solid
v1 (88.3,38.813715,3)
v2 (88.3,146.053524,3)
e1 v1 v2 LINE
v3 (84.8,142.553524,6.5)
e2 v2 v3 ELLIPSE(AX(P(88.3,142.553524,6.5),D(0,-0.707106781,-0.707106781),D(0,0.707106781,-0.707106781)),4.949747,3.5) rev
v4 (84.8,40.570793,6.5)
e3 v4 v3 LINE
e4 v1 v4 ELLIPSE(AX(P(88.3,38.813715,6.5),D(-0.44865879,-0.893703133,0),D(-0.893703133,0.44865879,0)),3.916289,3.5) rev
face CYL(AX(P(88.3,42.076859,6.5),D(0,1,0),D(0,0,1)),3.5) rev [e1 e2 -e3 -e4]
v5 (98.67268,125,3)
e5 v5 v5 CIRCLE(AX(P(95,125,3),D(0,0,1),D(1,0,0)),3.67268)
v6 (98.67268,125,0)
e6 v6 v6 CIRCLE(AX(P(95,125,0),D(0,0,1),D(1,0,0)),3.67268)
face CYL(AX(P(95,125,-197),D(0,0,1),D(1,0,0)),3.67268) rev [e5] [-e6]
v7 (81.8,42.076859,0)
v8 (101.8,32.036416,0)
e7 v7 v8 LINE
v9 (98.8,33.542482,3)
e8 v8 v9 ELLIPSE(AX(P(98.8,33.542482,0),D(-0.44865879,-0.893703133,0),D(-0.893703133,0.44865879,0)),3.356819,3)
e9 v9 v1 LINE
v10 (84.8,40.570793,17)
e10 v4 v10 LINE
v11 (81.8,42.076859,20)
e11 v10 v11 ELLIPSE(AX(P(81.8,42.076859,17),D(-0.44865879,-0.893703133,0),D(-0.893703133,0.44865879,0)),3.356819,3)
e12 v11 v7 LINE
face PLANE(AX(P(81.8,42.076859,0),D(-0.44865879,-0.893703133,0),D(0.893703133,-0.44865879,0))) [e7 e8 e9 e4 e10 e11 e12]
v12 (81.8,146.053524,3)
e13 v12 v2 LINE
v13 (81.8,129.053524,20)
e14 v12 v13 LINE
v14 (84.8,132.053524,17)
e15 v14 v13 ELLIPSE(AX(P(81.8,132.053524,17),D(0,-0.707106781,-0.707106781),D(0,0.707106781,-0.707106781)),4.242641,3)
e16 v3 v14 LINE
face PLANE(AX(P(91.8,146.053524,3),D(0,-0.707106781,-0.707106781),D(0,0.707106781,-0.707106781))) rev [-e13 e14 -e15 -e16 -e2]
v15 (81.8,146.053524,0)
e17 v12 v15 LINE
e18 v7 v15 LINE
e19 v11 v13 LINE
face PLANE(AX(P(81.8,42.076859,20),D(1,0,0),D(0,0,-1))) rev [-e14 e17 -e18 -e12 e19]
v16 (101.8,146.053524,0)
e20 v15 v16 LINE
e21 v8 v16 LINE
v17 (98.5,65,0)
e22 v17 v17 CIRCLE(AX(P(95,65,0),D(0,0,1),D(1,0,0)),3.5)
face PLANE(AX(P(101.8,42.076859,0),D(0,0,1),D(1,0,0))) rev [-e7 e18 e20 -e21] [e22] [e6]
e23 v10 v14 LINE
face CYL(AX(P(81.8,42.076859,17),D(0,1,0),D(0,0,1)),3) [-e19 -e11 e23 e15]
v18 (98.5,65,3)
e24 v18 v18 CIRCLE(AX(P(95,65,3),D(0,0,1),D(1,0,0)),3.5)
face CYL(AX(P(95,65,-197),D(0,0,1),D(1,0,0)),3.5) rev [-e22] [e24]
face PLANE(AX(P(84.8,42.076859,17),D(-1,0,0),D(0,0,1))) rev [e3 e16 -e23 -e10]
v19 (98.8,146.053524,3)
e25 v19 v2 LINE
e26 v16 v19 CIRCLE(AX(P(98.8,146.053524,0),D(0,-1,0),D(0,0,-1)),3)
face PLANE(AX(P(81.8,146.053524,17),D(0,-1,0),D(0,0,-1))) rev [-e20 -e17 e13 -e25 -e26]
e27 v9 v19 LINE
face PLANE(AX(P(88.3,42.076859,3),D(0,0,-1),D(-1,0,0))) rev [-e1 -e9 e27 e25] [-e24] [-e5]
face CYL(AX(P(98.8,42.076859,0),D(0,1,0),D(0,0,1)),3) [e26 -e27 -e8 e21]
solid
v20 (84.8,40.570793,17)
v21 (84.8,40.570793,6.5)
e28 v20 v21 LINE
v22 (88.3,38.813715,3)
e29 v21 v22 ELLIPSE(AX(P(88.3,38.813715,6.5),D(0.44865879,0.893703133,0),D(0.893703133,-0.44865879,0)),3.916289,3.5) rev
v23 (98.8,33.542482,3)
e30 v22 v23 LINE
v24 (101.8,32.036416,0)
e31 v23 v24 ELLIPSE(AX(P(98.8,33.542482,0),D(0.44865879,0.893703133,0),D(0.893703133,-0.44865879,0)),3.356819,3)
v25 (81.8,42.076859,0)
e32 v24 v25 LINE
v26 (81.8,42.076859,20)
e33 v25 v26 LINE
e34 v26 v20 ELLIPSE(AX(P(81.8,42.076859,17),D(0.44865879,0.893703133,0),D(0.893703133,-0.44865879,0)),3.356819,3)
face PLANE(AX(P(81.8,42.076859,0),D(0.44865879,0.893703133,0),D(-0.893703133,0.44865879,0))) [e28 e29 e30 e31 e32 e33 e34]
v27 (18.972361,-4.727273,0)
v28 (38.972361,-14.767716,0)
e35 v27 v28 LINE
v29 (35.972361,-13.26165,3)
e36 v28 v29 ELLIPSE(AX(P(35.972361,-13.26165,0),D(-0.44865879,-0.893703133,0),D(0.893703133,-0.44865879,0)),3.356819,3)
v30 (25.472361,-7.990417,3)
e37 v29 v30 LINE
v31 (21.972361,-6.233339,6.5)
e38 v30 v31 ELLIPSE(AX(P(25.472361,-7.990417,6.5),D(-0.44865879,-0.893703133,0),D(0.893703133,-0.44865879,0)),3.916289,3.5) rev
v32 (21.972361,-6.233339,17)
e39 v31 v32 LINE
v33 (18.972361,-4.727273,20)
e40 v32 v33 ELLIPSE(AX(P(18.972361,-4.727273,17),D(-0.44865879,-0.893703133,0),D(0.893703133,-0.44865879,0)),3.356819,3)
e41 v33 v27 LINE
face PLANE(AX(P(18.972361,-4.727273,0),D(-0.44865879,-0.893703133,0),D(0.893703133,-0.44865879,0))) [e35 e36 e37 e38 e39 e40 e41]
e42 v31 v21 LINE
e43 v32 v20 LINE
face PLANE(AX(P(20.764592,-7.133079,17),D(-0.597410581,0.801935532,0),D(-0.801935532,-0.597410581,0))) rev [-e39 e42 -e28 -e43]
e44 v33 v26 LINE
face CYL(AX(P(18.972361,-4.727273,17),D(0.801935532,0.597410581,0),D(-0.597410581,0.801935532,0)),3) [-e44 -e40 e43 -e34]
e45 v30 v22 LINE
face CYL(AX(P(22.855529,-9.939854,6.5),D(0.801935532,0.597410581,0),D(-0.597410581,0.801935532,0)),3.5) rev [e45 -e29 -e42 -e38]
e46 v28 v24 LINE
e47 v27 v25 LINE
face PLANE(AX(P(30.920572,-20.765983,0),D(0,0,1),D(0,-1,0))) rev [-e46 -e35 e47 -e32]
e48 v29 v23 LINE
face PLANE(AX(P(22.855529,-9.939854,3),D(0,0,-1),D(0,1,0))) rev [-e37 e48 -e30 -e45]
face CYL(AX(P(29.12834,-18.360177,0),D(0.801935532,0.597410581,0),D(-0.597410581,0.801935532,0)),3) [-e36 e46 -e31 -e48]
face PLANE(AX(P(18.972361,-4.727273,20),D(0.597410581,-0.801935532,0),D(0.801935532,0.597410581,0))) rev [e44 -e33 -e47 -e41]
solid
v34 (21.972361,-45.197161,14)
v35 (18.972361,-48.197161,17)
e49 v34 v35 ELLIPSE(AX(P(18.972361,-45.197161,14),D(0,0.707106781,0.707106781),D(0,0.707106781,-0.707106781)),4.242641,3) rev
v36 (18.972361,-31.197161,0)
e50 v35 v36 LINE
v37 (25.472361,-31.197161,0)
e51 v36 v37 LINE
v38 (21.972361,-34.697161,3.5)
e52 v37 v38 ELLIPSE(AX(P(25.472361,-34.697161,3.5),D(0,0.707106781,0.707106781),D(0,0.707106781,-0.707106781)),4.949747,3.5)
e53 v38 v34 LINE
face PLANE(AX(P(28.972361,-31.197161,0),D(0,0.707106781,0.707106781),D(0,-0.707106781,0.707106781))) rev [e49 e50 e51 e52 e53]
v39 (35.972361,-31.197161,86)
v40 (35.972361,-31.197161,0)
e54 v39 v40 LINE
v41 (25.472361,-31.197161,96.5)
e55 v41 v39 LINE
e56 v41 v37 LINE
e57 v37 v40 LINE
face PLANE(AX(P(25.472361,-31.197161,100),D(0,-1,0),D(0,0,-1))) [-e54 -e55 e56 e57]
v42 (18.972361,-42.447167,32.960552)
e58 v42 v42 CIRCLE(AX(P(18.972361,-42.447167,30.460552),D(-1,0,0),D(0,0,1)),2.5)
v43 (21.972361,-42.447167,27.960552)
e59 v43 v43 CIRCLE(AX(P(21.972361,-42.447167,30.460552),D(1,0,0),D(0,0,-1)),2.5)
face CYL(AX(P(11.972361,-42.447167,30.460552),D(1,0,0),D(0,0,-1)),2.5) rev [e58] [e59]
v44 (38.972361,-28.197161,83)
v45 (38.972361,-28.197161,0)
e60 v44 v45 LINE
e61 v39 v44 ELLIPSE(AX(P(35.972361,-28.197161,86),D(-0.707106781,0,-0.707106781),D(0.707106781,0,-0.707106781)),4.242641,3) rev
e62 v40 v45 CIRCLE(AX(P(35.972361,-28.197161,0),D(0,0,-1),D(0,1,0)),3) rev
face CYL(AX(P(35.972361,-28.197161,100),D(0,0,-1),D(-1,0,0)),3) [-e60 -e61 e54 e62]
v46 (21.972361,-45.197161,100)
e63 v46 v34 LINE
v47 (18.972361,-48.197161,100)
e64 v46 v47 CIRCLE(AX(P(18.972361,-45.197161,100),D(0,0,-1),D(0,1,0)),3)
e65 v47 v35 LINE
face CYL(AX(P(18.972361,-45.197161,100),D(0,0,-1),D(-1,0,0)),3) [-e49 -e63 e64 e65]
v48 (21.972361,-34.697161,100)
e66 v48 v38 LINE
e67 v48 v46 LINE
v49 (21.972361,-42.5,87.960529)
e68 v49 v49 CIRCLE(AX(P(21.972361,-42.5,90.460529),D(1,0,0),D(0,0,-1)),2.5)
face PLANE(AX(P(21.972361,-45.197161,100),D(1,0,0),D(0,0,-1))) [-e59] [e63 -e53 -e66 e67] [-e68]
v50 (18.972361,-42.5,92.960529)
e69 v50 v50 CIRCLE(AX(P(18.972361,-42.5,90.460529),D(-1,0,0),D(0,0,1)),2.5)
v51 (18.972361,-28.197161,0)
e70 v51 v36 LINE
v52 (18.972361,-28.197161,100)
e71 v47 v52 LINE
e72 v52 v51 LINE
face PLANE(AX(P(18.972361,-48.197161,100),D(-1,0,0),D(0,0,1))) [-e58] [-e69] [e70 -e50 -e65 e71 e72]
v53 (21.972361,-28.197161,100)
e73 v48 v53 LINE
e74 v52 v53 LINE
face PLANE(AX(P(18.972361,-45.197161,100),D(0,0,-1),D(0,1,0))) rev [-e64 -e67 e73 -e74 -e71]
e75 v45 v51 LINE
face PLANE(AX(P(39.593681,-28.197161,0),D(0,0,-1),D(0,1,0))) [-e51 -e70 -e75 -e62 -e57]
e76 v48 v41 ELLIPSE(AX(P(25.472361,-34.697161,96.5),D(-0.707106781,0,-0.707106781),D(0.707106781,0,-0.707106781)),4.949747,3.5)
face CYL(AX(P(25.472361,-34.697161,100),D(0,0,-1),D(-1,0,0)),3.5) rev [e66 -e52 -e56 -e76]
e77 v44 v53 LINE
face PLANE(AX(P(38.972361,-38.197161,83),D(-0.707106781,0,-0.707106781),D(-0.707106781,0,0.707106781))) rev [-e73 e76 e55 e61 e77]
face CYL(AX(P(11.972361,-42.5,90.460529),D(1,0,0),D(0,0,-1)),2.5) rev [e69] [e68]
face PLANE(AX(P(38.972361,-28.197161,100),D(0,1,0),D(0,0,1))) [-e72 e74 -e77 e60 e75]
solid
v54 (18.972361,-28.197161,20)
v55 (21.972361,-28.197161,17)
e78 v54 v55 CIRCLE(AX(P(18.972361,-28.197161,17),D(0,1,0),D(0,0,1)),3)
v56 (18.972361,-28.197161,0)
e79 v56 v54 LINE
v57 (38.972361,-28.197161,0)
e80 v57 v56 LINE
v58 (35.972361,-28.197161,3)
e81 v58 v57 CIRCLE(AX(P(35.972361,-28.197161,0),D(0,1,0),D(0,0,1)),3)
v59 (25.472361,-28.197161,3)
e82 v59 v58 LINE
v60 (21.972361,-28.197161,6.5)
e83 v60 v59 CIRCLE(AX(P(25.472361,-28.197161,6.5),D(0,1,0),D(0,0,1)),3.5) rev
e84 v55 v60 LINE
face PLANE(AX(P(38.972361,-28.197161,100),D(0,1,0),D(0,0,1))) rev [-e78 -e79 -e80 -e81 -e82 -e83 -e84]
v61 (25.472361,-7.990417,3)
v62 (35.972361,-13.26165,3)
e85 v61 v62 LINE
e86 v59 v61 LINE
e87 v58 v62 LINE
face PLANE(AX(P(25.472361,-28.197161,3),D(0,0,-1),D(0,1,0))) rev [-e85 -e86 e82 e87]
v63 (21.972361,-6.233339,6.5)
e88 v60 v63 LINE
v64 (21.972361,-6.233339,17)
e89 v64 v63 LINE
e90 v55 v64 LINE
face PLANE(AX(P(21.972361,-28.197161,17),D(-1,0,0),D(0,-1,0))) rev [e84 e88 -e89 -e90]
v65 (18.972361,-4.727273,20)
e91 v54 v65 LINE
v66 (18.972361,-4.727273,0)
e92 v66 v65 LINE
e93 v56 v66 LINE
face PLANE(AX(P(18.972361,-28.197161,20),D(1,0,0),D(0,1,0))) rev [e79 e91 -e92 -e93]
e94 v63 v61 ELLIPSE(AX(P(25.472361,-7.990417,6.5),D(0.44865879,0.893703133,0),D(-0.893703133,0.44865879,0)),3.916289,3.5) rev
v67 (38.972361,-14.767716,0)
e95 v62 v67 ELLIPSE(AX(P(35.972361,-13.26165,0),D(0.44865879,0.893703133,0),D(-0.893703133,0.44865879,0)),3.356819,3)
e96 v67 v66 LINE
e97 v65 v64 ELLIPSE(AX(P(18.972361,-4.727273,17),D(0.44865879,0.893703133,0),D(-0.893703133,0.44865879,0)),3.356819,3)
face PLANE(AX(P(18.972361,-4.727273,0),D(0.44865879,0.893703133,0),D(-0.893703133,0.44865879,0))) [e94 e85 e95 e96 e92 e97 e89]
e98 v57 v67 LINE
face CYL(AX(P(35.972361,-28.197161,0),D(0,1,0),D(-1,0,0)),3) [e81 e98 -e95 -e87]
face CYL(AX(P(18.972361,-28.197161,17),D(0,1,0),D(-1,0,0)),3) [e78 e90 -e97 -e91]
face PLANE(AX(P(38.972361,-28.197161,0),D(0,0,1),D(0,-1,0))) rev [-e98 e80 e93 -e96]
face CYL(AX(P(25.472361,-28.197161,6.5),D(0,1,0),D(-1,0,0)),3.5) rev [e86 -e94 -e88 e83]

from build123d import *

# Parameters (mm, degrees)
L_START                              = 32.036415807
L_ANGLE_EQUAL_20X20X3_2_DEPTH        = 114.017108684
L_START_2                            = 64
L_ANGLE_EQUAL_20X20X3_2_2_OUTLINE_W  = 25
L_ANGLE_EQUAL_20X20X3_2_2_OUTLINE_H  = 24
L_ANGLE_EQUAL_20X20X3_2_2_DEPTH      = 10.304509974
L_START_3                            = 22.430930733
L_ANGLE_EQUAL_20X20X3_2_3_DEPTH      = 68.304556748
L_START_4                            = 12.390487258
L_ANGLE_EQUAL_20X20X3_2_4_DEPTH      = 88.385443698
L_START_5                            = -6
L_ANGLE_EQUAL_20X20X3_2_5_OUTLINE_W  = 60
L_ANGLE_EQUAL_20X20X3_2_5_OUTLINE_H  = 21
L_ANGLE_EQUAL_20X20X3_2_5_DEPTH      = 10.287337797
L_START_6                            = 74.304509974
L_ANGLE_EQUAL_20X20X3_2_6_OUTLINE_W  = 60
L_ANGLE_EQUAL_20X20X3_2_6_OUTLINE_H  = 21
L_ANGLE_EQUAL_20X20X3_2_6_DEPTH      = 9.695490026
L_START_7                            = -45.197160902
L_ANGLE_EQUAL_20X20X3_2_7_DEPTH      = 17
L_START_8                            = 1.242640687
L_ANGLE_EQUAL_20X20X3_2_8_DEPTH      = 98.757359313
L_START_9                            = 18.242640687
L_ANGLE_EQUAL_20X20X3_2_9_DEPTH      = 81.757359313
L_START_10                           = -49
L_ANGLE_EQUAL_20X20X3_2_10_DEPTH     = 22
L_START_11                           = -48.197160902
L_ANGLE_EQUAL_20X20X3_2_11_DEPTH     = 33.429444614
L_START_12                           = -14.767716288
L_ANGLE_EQUAL_20X20X3_2_12_DEPTH     = 10.040443476
L_START_13                           = 4.287337797
L_ANGLE_EQUAL_20X20X3_2_13_OUTLINE_W = 25
L_ANGLE_EQUAL_20X20X3_2_13_OUTLINE_H = 22
L_ANGLE_EQUAL_20X20X3_2_13_DEPTH     = 8.973175794
ESBO_O2_R                            = 3.5
ESBO_O2_R_2                          = 3.672679552
CORTE_EXTRUS_O1_DEPTH                = 200
ESBO_O3_R                            = 2.5
CORTE_EXTRUS_O2_DEPTH                = 10
CORTE_EXTRUS_O3_DEPTH                = 10
CORTE_EXTRUS_O4_DEPTH                = 10
CORTE_EXTRUS_O5_DEPTH                = 10
APARAR_ESTENDER4_START               = -48.197160902
APARAR_ESTENDER4_DEPTH               = 20
APARAR_ESTENDER4_2_DEPTH             = 20.621320344
CORTE_EXTRUS_O6_DEPTH                = 10


with BuildPart() as part:
    # L angle (equal) 20X20X3(2): read off the stored shape, not the designer's step
    # L angle (equal) 20X20X3(2) outline → L angle (equal) 20X20X3(2) (new body)
    with BuildSketch(Plane(origin=(0, 0, 0), x_dir=(1, 0, 0), z_dir=(0, 1, 0)).offset(L_START)):
        with BuildLine():
            Line((101.8, 0), (81.8, 0))
            Line((81.8, 0), (81.8, -20))
            ThreePointArc((81.8, -20), (83.921320344, -19.121320344), (84.8, -17))
            Line((84.8, -17), (84.8, -6.5))
            ThreePointArc((84.8, -6.5), (85.825126266, -4.025126266), (88.3, -3))
            Line((88.3, -3), (98.8, -3))
            ThreePointArc((98.8, -3), (100.921320344, -2.121320344), (101.8, 0))
        make_face()
    extrude(amount=L_ANGLE_EQUAL_20X20X3_2_DEPTH)

    # L angle _equal_ 20X20X3_2 2 outline → L angle _equal_ 20X20X3_2 2 (cut)
    with BuildSketch(Plane(origin=(0, 0, 0), x_dir=(0.8937031332908548, -0.4486587896677259, 0), z_dir=(0.4486587896677259, 0.8937031332908548, 0)).offset(L_START_2)):
        with Locations((65.5, -10)):
            Rectangle(L_ANGLE_EQUAL_20X20X3_2_2_OUTLINE_W, L_ANGLE_EQUAL_20X20X3_2_2_OUTLINE_H)
    extrude(amount=L_ANGLE_EQUAL_20X20X3_2_2_DEPTH, mode=Mode.SUBTRACT)

    # Esboço2 → Corte-extrusão1 (cut)
    with BuildSketch(Plane.XY.offset(3)):
        with Locations((95, 65)):
            Circle(ESBO_O2_R)
        with Locations((95, 125)):
            Circle(ESBO_O2_R_2)
    extrude(amount=-CORTE_EXTRUS_O1_DEPTH, mode=Mode.SUBTRACT)

    # Esboço5 → Corte-extrusão4 (cut)
    with BuildSketch(Plane.ZY.offset(-81.8)):
        Polygon((3, 146.053524491), (20, 129.053524491), (20, 146.053524491), align=None)
    extrude(amount=-CORTE_EXTRUS_O4_DEPTH, mode=Mode.SUBTRACT)


with BuildPart() as body_2:
    # L angle _equal_ 20X20X3_2 3 outline → L angle _equal_ 20X20X3_2 3 (new body)
    with BuildSketch(Plane(origin=(0, 0, 0), x_dir=(0.5974105809077824, -0.8019355322090584, 0), z_dir=(0.8019355322090584, 0.5974105809077825, 0)).offset(L_START_3)):
        with BuildLine():
            Line((35.125256976, 0), (15.125256976, 0))
            Line((15.125256976, 0), (15.125256976, -20))
            ThreePointArc((15.125256976, -20), (17.24657732, -19.121320344), (18.125256976, -17))
            Line((18.125256976, -17), (18.125256976, -6.5))
            ThreePointArc((18.125256976, -6.5), (19.150383242, -4.025126266), (21.625256976, -3))
            Line((21.625256976, -3), (32.125256976, -3))
            ThreePointArc((32.125256976, -3), (34.24657732, -2.121320344), (35.125256976, 0))
        make_face()
    extrude(amount=L_ANGLE_EQUAL_20X20X3_2_3_DEPTH)

    # L angle _equal_ 20X20X3_2 4 outline → L angle _equal_ 20X20X3_2 4 (add)
    with BuildSketch(Plane(origin=(0, 0, 0), x_dir=(0.5974105809077824, -0.8019355322090584, 0), z_dir=(0.8019355322090584, 0.5974105809077825, 0)).offset(L_START_4)):
        with BuildLine():
            Line((35.125256976, 0), (15.125256976, 0))
            Line((15.125256976, 0), (15.125256976, -20))
            ThreePointArc((15.125256976, -20), (17.24657732, -19.121320344), (18.125256976, -17))
            Line((18.125256976, -17), (18.125256976, -6.5))
            ThreePointArc((18.125256976, -6.5), (19.150383242, -4.025126266), (21.625256976, -3))
            Line((21.625256976, -3), (32.125256976, -3))
            ThreePointArc((32.125256976, -3), (34.24657732, -2.121320344), (35.125256976, 0))
        make_face()
    extrude(amount=L_ANGLE_EQUAL_20X20X3_2_4_DEPTH)

    # L angle _equal_ 20X20X3_2 5 outline → L angle _equal_ 20X20X3_2 5 (cut)
    with BuildSketch(Plane(origin=(0, 0, 0), x_dir=(0.8937031332908548, -0.4486587896677259, 0), z_dir=(0.4486587896677259, 0.8937031332908548, 0)).offset(L_START_5)):
        with Locations((48, -10.5)):
            Rectangle(L_ANGLE_EQUAL_20X20X3_2_5_OUTLINE_W, L_ANGLE_EQUAL_20X20X3_2_5_OUTLINE_H)
    extrude(amount=L_ANGLE_EQUAL_20X20X3_2_5_DEPTH, mode=Mode.SUBTRACT)

    # L angle _equal_ 20X20X3_2 6 outline → L angle _equal_ 20X20X3_2 6 (cut)
    with BuildSketch(Plane(origin=(0, 0, 0), x_dir=(0.8937031332908548, -0.4486587896677259, 0), z_dir=(0.4486587896677259, 0.8937031332908548, 0)).offset(L_START_6)):
        with Locations((48, -10.5)):
            Rectangle(L_ANGLE_EQUAL_20X20X3_2_6_OUTLINE_W, L_ANGLE_EQUAL_20X20X3_2_6_OUTLINE_H)
    extrude(amount=L_ANGLE_EQUAL_20X20X3_2_6_DEPTH, mode=Mode.SUBTRACT)


with BuildPart() as body_3:
    # L angle _equal_ 20X20X3_2 7 outline → L angle _equal_ 20X20X3_2 7 (new body)
    with BuildSketch(Plane(origin=(0, 0, 0), x_dir=(1, 0, 0), z_dir=(0, 1, 0)).offset(L_START_7)):
        Polygon((19.593680894, -20.621320344), (18.97236055, -20), (18.97236055, -100), (21.97236055, -100), (21.97236055, -18.242640687), align=None)
    extrude(amount=L_ANGLE_EQUAL_20X20X3_2_7_DEPTH)

    # L angle _equal_ 20X20X3_2 8 outline → L angle _equal_ 20X20X3_2 8 (add)
    with BuildSketch(Plane.XY.offset(L_START_8)):
        with BuildLine():
            ThreePointArc((21.97236055, -34.697160902), (22.997486816, -32.222287168), (25.47236055, -31.197160902))
            Line((25.47236055, -31.197160902), (35.97236055, -31.197160902))
            ThreePointArc((35.97236055, -31.197160902), (38.093680894, -30.318481246), (38.97236055, -28.197160902))
            Line((38.97236055, -28.197160902), (21.97236055, -28.197160902))
            Line((21.97236055, -28.197160902), (21.97236055, -34.697160902))
        make_face()
    extrude(amount=L_ANGLE_EQUAL_20X20X3_2_8_DEPTH)

    # L angle _equal_ 20X20X3_2 9 outline → L angle _equal_ 20X20X3_2 9 (add)
    with BuildSketch(Plane.XY.offset(L_START_9)):
        with BuildLine():
            ThreePointArc((18.97236055, -48.197160902), (21.093680894, -47.318481246), (21.97236055, -45.197160902))
            Line((21.97236055, -45.197160902), (18.97236055, -45.197160902))
            Line((18.97236055, -45.197160902), (18.97236055, -48.197160902))
        make_face()
    extrude(amount=L_ANGLE_EQUAL_20X20X3_2_9_DEPTH)

    # L angle _equal_ 20X20X3_2 10 outline → L angle _equal_ 20X20X3_2 10 (cut)
    with BuildSketch(Plane(origin=(0, 0, 0), x_dir=(1, 0, 0), z_dir=(0, 1, 0)).offset(L_START_10)):
        Polygon((35.97236055, -3), (36.593680894, -3.621320344), (38.97236055, -1.242640687), (21.97236055, -1.242640687), (21.97236055, -6.5), (25.47236055, -3), align=None)
        Polygon((19.593680894, -20.621320344), (21.97236055, -18.242640687), (18.97236055, -18.242640687), (18.97236055, -20), align=None)
        Polygon((22.593680894, -17.621320344), (21.97236055, -17), (21.97236055, -18.242640687), align=None)
    extrude(amount=L_ANGLE_EQUAL_20X20X3_2_10_DEPTH, mode=Mode.SUBTRACT)

    # Esboço3 → Corte-extrusão2 (cut)
    with BuildSketch(Plane(origin=(21.97236055, 0, 0), x_dir=(0, 0, -1), z_dir=(1, 0, 0))):
        with Locations((-90.460528522, -42.5)):
            Circle(ESBO_O3_R)
        with Locations((-30.460551783, -42.447167301)):
            Circle(ESBO_O3_R)
    extrude(amount=-CORTE_EXTRUS_O2_DEPTH, mode=Mode.SUBTRACT)

    # Esboço6 → Corte-extrusão5 (cut)
    with BuildSketch(Plane(origin=(0, -28.197160902, 0), x_dir=(1, 0, 0), z_dir=(0, 1, 0))):
        Polygon((21.97236055, -100), (38.97236055, -100), (38.97236055, -83), align=None)
    extrude(amount=-CORTE_EXTRUS_O5_DEPTH, mode=Mode.SUBTRACT)

    # Aparar_Estender4 2 outline → Aparar_Estender4 2 (add)
    with BuildSketch(Plane.XY):
        with BuildLine():
            ThreePointArc((35.97236055, -31.197160902), (38.093680894, -30.318481246), (38.97236055, -28.197160902))
            Line((38.97236055, -28.197160902), (18.97236055, -28.197160902))
            Line((18.97236055, -28.197160902), (18.97236055, -48.197160902))
            ThreePointArc((18.97236055, -48.197160902), (21.093680894, -47.318481246), (21.97236055, -45.197160902))
            Line((21.97236055, -45.197160902), (21.97236055, -34.697160902))
            ThreePointArc((21.97236055, -34.697160902), (22.997486816, -32.222287168), (25.47236055, -31.197160902))
            Line((25.47236055, -31.197160902), (35.97236055, -31.197160902))
        make_face()
    extrude(amount=APARAR_ESTENDER4_2_DEPTH)

    # Esboço7 → Corte-extrusão6 (cut)
    with BuildSketch(Plane.ZY.offset(-18.97236055)):
        Polygon((0, -31.197160902), (17, -48.197160902), (0, -48.197160902), align=None)
    extrude(amount=-CORTE_EXTRUS_O6_DEPTH, mode=Mode.SUBTRACT)


with BuildPart() as body_4:
    # L angle _equal_ 20X20X3_2 11 outline → L angle _equal_ 20X20X3_2 11 (new body)
    with BuildSketch(Plane(origin=(0, 0, 0), x_dir=(1, 0, 0), z_dir=(0, 1, 0)).offset(L_START_11)):
        with BuildLine():
            Line((38.97236055, 0), (18.97236055, 0))
            Line((18.97236055, 0), (18.97236055, -20))
            ThreePointArc((18.97236055, -20), (21.093680894, -19.121320344), (21.97236055, -17))
            Line((21.97236055, -17), (21.97236055, -6.5))
            ThreePointArc((21.97236055, -6.5), (22.997486816, -4.025126266), (25.47236055, -3))
            Line((25.47236055, -3), (35.97236055, -3))
            ThreePointArc((35.97236055, -3), (38.093680894, -2.121320344), (38.97236055, 0))
        make_face()
    extrude(amount=L_ANGLE_EQUAL_20X20X3_2_11_DEPTH)

    # L angle _equal_ 20X20X3_2 12 outline → L angle _equal_ 20X20X3_2 12 (add)
    with BuildSketch(Plane(origin=(0, 0, 0), x_dir=(1, 0, 0), z_dir=(0, 1, 0)).offset(L_START_12)):
        with BuildLine():
            Line((38.97236055, 0), (18.97236055, 0))
            Line((18.97236055, 0), (18.97236055, -20))
            ThreePointArc((18.97236055, -20), (21.093680894, -19.121320344), (21.97236055, -17))
            Line((21.97236055, -17), (21.97236055, -6.5))
            ThreePointArc((21.97236055, -6.5), (22.997486816, -4.025126266), (25.47236055, -3))
            Line((25.47236055, -3), (35.97236055, -3))
            ThreePointArc((35.97236055, -3), (38.093680894, -2.121320344), (38.97236055, 0))
        make_face()
    extrude(amount=L_ANGLE_EQUAL_20X20X3_2_12_DEPTH)

    # L angle _equal_ 20X20X3_2 13 outline → L angle _equal_ 20X20X3_2 13 (cut)
    with BuildSketch(Plane(origin=(0, 0, 0), x_dir=(0.8937031332908548, -0.4486587896677259, 0), z_dir=(0.4486587896677259, 0.8937031332908548, 0)).offset(L_START_13)):
        with Locations((30.5, -11)):
            Rectangle(L_ANGLE_EQUAL_20X20X3_2_13_OUTLINE_W, L_ANGLE_EQUAL_20X20X3_2_13_OUTLINE_H)
    extrude(amount=L_ANGLE_EQUAL_20X20X3_2_13_DEPTH, mode=Mode.SUBTRACT)

    # Esboço4 → Corte-extrusão3 (cut)
    with BuildSketch(Plane(origin=(0, 0, 0), x_dir=(-1, 0, 0), z_dir=(0, 0, -1))):
        Polygon((-21.97236055, -48.197160902), (-38.97236055, -31.197160902), (-38.97236055, -48.197160902), align=None)
    extrude(amount=-CORTE_EXTRUS_O3_DEPTH, mode=Mode.SUBTRACT)

    # Aparar/Estender4: read off the stored shape, not the designer's step
    # Aparar/Estender4 outline → Aparar/Estender4 (cut)
    with BuildSketch(Plane(origin=(0, 0, 0), x_dir=(1, 0, 0), z_dir=(0, 1, 0)).offset(APARAR_ESTENDER4_START)):
        with BuildLine():
            Line((38.97236055, 0), (18.97236055, 0))
            Line((18.97236055, 0), (18.97236055, -20))
            ThreePointArc((18.97236055, -20), (21.093680894, -19.121320344), (21.97236055, -17))
            Line((21.97236055, -17), (21.97236055, -6.5))
            ThreePointArc((21.97236055, -6.5), (22.997486816, -4.025126266), (25.47236055, -3))
            Line((25.47236055, -3), (35.97236055, -3))
            ThreePointArc((35.97236055, -3), (38.093680894, -2.121320344), (38.97236055, 0))
        make_face()
    extrude(amount=APARAR_ESTENDER4_DEPTH, mode=Mode.SUBTRACT)


solid = Compound([part.part, body_2.part, body_3.part, body_4.part])
